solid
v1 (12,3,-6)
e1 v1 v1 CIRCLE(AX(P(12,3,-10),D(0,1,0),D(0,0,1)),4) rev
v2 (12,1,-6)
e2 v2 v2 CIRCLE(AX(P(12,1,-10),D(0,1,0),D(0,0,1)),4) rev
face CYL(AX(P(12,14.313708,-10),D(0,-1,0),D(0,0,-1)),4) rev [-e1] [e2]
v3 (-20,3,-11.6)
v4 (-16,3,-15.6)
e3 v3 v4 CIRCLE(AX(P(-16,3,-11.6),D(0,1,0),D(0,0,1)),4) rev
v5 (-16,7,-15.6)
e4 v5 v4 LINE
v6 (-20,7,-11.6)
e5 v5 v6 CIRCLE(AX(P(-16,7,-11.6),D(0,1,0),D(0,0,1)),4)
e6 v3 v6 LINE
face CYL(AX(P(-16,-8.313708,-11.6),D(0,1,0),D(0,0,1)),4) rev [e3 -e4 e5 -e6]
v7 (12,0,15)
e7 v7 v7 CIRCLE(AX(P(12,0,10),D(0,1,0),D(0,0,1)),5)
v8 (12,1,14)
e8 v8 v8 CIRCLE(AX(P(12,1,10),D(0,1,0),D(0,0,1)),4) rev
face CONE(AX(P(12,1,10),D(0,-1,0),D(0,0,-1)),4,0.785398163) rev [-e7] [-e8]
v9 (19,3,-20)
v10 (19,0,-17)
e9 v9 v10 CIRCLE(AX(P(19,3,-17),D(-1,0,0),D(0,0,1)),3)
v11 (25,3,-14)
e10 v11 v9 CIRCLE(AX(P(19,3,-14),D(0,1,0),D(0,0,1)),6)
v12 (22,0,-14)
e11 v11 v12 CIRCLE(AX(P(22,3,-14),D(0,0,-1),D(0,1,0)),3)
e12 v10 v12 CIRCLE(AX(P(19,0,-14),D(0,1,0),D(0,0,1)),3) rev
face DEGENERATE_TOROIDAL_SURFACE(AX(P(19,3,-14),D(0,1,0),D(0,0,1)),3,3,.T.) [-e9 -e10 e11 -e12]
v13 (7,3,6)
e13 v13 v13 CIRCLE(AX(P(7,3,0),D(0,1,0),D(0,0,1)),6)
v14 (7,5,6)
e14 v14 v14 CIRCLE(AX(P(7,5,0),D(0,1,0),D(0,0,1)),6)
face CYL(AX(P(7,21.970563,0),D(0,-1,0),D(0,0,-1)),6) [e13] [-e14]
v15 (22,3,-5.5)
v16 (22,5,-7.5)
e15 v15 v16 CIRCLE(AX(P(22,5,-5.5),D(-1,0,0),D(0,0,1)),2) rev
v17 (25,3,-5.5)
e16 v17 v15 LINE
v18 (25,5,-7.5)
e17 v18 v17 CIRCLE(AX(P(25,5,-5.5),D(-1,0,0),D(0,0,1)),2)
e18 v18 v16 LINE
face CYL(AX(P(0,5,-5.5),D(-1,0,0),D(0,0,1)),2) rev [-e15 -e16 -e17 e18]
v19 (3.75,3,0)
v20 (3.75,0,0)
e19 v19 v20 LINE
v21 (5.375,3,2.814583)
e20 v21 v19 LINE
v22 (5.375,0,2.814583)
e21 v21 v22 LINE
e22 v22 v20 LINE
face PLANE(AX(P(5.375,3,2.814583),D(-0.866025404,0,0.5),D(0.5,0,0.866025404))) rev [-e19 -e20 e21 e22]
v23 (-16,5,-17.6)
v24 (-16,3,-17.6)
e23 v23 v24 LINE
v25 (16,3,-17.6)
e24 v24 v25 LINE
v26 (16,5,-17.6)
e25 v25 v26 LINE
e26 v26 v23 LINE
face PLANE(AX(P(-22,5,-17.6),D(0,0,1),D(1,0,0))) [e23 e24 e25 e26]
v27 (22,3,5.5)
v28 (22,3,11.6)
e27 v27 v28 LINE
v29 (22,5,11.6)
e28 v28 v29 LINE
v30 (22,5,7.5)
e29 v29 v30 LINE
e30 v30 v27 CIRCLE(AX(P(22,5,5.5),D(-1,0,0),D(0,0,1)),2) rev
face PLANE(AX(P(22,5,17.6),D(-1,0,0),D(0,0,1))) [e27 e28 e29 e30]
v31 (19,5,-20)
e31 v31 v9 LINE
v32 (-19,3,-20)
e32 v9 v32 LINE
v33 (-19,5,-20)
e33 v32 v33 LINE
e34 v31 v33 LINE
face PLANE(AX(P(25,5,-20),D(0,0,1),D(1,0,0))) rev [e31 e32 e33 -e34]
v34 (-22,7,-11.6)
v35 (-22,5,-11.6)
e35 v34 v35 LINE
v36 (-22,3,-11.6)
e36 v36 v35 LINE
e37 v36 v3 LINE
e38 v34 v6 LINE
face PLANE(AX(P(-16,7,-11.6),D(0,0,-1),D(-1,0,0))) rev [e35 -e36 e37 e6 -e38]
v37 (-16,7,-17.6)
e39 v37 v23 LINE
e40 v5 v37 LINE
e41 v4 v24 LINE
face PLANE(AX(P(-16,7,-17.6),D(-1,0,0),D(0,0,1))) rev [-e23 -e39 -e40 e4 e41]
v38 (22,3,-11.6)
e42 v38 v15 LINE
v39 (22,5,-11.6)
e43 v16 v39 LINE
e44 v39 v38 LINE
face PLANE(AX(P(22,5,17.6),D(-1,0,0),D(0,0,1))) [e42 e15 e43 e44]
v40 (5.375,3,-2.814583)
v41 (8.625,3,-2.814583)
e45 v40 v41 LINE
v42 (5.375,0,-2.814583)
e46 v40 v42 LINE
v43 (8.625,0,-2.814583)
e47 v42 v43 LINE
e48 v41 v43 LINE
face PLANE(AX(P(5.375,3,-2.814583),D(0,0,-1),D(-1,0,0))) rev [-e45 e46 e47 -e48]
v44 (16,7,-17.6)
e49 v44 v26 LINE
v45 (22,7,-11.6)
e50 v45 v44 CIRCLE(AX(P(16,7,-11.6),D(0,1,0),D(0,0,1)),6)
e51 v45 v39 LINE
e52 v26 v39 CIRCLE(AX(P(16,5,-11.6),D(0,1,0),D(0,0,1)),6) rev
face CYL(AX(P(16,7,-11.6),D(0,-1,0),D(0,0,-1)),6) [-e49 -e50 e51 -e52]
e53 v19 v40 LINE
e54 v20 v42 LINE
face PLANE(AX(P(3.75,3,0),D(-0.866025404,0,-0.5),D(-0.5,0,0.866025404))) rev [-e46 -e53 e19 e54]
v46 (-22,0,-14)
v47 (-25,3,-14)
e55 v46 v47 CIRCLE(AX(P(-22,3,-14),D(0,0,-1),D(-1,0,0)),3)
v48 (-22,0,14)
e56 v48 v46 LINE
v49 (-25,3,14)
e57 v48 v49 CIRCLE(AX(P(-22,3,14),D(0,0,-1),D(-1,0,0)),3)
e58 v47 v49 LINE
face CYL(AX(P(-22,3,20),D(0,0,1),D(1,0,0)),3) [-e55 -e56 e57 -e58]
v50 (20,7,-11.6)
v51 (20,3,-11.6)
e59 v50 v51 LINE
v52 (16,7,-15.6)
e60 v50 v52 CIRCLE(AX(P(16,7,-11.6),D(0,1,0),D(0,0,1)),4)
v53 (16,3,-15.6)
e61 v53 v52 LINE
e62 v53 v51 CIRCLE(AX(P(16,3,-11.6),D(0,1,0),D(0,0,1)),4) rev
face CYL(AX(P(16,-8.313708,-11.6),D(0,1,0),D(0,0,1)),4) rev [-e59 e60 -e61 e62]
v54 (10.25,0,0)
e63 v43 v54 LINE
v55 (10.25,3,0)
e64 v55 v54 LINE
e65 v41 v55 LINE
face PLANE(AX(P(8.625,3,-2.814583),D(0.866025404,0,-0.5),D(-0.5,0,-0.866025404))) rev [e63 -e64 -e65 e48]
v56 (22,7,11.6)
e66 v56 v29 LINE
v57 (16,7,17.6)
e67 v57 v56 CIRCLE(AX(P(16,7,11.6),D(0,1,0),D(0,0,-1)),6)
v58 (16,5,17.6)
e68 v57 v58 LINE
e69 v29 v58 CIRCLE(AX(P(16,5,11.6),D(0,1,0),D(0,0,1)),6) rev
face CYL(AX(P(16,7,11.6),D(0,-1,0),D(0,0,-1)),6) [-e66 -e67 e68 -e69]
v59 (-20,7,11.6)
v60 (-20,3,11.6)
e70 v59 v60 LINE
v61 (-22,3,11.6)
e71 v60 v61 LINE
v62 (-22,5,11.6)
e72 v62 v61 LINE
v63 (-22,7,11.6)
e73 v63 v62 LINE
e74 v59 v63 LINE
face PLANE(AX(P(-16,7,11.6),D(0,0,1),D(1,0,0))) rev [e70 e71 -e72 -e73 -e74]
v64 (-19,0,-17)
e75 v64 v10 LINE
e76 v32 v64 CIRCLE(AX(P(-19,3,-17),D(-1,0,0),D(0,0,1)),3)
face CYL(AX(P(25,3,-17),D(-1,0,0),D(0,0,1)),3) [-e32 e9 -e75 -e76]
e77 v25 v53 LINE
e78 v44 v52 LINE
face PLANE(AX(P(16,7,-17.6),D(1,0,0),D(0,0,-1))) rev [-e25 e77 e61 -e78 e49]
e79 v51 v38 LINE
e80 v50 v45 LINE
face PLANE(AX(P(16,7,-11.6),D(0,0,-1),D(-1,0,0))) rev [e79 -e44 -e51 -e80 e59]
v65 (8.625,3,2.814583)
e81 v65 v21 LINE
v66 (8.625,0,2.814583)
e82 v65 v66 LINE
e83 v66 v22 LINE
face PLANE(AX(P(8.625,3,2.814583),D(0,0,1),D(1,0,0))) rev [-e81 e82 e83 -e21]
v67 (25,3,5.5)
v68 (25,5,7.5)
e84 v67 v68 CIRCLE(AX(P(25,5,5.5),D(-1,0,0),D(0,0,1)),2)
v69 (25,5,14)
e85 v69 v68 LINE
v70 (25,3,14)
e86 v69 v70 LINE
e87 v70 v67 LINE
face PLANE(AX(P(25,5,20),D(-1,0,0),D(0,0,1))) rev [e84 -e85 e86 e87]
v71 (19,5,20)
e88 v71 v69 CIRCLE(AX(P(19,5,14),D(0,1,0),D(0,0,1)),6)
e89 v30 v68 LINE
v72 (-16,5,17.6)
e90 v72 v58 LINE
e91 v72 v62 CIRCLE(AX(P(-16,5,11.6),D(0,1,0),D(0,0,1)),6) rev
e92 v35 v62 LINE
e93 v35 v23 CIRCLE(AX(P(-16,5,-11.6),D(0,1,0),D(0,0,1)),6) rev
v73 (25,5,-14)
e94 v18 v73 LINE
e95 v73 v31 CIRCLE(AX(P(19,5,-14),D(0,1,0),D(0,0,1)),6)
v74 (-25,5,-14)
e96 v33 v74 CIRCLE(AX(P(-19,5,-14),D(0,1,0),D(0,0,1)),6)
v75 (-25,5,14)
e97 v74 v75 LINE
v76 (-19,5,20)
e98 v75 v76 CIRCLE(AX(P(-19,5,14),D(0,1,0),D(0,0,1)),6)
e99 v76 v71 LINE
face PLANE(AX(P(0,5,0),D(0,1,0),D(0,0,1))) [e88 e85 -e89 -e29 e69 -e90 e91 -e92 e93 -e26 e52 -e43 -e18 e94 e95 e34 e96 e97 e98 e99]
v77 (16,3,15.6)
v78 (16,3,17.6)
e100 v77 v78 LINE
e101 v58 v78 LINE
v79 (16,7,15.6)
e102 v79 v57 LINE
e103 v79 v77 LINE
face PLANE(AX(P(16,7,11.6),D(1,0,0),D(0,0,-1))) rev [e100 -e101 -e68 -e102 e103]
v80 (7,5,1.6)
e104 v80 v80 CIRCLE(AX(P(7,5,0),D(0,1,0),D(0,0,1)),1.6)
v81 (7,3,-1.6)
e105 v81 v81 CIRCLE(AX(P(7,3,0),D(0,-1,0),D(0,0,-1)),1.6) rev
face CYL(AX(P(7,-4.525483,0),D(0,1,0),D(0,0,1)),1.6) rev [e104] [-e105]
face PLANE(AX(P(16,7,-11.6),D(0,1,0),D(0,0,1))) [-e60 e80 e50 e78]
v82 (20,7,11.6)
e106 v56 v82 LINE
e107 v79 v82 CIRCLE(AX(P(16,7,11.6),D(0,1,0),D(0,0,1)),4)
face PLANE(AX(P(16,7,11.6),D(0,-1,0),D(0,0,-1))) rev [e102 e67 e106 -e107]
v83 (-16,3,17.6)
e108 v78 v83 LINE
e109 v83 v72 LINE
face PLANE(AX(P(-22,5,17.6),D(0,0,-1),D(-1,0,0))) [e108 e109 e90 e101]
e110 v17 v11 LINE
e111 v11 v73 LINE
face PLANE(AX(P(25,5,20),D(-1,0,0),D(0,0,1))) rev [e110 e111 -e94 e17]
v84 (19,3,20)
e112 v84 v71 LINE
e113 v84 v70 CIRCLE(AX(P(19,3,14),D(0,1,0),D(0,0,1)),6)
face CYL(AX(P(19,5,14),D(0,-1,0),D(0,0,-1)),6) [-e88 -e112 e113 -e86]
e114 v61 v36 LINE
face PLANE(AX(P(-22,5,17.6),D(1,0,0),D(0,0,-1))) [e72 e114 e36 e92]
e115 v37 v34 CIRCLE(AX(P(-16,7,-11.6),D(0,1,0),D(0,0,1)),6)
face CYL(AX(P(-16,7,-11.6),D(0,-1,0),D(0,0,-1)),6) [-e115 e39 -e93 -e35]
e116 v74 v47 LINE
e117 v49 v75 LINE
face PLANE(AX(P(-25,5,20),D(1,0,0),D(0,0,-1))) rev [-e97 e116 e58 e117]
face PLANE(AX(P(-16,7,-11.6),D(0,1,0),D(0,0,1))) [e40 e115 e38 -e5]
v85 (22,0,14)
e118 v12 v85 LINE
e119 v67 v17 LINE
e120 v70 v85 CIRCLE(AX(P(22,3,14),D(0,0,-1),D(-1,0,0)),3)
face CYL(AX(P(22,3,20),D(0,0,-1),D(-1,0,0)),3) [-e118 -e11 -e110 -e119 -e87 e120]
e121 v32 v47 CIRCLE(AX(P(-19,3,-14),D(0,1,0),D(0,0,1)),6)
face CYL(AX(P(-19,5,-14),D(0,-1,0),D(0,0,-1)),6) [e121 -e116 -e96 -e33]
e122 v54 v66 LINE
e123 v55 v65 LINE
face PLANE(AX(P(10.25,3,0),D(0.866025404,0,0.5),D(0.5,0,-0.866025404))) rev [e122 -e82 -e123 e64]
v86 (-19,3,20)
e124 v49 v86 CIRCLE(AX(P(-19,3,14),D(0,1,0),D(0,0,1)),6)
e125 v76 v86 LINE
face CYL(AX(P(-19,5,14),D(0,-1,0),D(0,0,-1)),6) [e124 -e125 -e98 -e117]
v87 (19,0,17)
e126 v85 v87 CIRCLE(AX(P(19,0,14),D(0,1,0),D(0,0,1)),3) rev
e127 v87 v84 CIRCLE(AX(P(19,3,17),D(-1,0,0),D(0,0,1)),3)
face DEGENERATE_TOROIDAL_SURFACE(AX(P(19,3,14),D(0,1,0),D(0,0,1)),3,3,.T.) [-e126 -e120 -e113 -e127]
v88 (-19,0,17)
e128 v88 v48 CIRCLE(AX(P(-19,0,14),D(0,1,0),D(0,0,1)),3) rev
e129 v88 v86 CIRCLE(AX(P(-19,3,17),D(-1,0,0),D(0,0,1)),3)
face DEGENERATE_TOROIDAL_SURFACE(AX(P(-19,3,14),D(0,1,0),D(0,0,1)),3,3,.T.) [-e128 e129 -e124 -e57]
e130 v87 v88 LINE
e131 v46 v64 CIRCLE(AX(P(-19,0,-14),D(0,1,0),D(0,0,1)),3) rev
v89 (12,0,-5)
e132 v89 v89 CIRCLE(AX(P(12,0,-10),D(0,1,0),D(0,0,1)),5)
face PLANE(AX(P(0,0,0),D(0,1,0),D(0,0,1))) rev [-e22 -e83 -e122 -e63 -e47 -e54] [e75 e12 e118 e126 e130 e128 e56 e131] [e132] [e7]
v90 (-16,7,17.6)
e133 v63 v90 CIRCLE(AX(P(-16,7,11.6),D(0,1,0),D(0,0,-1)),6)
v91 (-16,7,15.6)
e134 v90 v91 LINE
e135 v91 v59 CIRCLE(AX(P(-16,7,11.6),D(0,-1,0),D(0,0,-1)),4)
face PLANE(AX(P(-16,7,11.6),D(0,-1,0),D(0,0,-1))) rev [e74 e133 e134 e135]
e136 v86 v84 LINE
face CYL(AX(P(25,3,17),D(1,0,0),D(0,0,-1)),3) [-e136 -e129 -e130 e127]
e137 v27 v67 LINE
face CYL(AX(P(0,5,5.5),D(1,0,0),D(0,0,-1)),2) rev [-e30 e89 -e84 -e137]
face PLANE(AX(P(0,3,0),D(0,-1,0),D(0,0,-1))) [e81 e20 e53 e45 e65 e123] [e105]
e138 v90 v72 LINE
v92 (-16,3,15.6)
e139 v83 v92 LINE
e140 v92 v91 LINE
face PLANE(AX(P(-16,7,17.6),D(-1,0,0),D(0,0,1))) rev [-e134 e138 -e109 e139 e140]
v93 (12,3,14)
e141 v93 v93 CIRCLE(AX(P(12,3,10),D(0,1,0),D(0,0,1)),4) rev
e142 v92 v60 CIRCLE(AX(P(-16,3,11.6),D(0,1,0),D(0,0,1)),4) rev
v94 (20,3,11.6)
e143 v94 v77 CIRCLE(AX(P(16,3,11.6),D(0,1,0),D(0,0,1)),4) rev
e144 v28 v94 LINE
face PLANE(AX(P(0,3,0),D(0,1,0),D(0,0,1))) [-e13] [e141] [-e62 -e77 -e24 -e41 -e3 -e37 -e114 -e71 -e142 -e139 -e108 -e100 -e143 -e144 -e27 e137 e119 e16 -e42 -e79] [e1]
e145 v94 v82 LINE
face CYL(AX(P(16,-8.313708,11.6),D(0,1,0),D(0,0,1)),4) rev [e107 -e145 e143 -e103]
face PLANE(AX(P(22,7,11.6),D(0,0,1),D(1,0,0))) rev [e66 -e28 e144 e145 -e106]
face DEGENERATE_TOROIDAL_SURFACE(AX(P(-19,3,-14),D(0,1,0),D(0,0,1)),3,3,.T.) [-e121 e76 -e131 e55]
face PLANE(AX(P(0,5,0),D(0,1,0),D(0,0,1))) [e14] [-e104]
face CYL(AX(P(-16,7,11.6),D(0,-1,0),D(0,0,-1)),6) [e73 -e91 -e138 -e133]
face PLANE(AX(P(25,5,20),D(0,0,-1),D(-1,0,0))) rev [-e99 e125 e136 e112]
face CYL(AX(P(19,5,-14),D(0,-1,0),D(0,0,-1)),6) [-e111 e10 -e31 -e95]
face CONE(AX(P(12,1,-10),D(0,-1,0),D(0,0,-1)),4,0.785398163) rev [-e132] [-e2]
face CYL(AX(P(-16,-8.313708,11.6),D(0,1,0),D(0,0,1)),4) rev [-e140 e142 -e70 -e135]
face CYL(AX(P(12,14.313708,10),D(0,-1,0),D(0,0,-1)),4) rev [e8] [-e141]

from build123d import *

# Parameters (mm, degrees)
SKETCH1_W           = 50
SKETCH1_H           = 40
SKETCH1_W_2         = 44
SKETCH1_H_2         = 35.2
BOSS_EXTRUDE1_DEPTH = 5
SKETCH2_W           = 44
SKETCH2_H           = 35.2
BOSS_EXTRUDE2_DEPTH = 3
SKETCH3_R           = 6
BOSS_EXTRUDE3_DEPTH = 2
SKETCH4_R           = 1.6
CUT_EXTRUDE1_DEPTH  = 5
FILLET1_R           = 6
FILLET2_R           = 3
CUT_EXTRUDE2_DEPTH  = 3
SKETCH8_R           = 4
CUT_EXTRUDE3_DEPTH  = 3
CHAMFER1_SIZE       = 1
SKETCH9_W           = 3
SKETCH9_H           = 15
CUT_EXTRUDE4_DEPTH  = 2
FILLET3_R           = 2
BOSS_EXTRUDE5_START = 4
BOSS_EXTRUDE5_DEPTH = 4
SKETCH11_R          = 4
CUT_EXTRUDE5_DEPTH  = 4


with BuildPart() as part:
    # Sketch1 → Boss-Extrude1 (new body)
    with BuildSketch(Plane(origin=(0, 0, 0), x_dir=(1, 0, 0), z_dir=(0, 1, 0))):
        Rectangle(SKETCH1_W, SKETCH1_H)
        Rectangle(SKETCH1_W_2, SKETCH1_H_2, mode=Mode.SUBTRACT)
    extrude(amount=BOSS_EXTRUDE1_DEPTH)

    # Sketch2 → Boss-Extrude2 (add)
    with BuildSketch(Plane(origin=(0, 0, 0), x_dir=(-1, 0, 0), z_dir=(0, -1, 0))):
        Rectangle(SKETCH2_W, SKETCH2_H)
    extrude(amount=-BOSS_EXTRUDE2_DEPTH)

    # Sketch3 → Boss-Extrude3 (add)
    with BuildSketch(Plane(origin=(0, 3, 0), x_dir=(1, 0, 0), z_dir=(0, 1, 0))):
        with Locations(Location((7, 0, 0), (0, 0, 270))):
            Circle(SKETCH3_R)
    extrude(amount=BOSS_EXTRUDE3_DEPTH)

    # Sketch4 → Cut-Extrude1 (cut)
    with BuildSketch(Plane(origin=(0, 5, 0), x_dir=(1, 0, 0), z_dir=(0, 1, 0))):
        with Locations(Location((7, 0, 0), (0, 0, 270))):
            Circle(SKETCH4_R)
    extrude(amount=-CUT_EXTRUDE1_DEPTH, mode=Mode.SUBTRACT)

    # Fillet1
    fillet1_edges = [part.edges().sort_by_distance(p)[0] for p in [
        (22, 4, 17.6),
        (22, 4, -17.6),
        (-22, 4, -17.6),
        (-22, 4, 17.6),
        (-25, 2.5, -20),
        (25, 2.5, -20),
        (25, 2.5, 20),
        (-25, 2.5, 20),
    ]]
    fillet(fillet1_edges, radius=FILLET1_R)

    # Fillet2
    fillet2_edges = [part.edges().sort_by_distance(p)[0] for p in [
        (-25, 0, 0),
        (0, 0, -20),
        (25, 0, 0),
        (0, 0, 20),
        (23.242640687, 0, -18.242640687),
        (23.242640687, 0, 18.242640687),
        (-23.242640687, 0, 18.242640687),
        (-23.242640687, 0, -18.242640687),
    ]]
    fillet(fillet2_edges, radius=FILLET2_R)

    # Sketch6 → Cut-Extrude2 (cut)
    with BuildSketch(Plane(origin=(0, 0, 0), x_dir=(-1, 0, 0), z_dir=(0, -1, 0))):
        Polygon((-3.75, 0), (-5.375, 2.814582562), (-8.625, 2.814582562), (-10.25, 0), (-8.625, -2.814582562), (-5.375, -2.814582562), align=None)
    extrude(amount=-CUT_EXTRUDE2_DEPTH, mode=Mode.SUBTRACT)

    # Sketch8 → Cut-Extrude3 (cut)
    with BuildSketch(Plane(origin=(0, 0, 0), x_dir=(-1, 0, 0), z_dir=(0, -1, 0))):
        with Locations(Location((-12, -10, 0), (0, 0, 90))):
            Circle(SKETCH8_R)
        with Locations(Location((-12, 10, 0), (0, 0, 90))):
            Circle(SKETCH8_R)
    extrude(amount=-CUT_EXTRUDE3_DEPTH, mode=Mode.SUBTRACT)

    # Chamfer1
    chamfer1_edges = [part.edges().sort_by_distance(p)[0] for p in [
        (12, 0, 14),
        (12, 0, -6),
    ]]
    chamfer(chamfer1_edges, length=CHAMFER1_SIZE)

    # Sketch9 → Cut-Extrude4 (cut)
    with BuildSketch(Plane(origin=(0, 5, 0), x_dir=(1, 0, 0), z_dir=(0, 1, 0))):
        with Locations((23.5, 0)):
            Rectangle(SKETCH9_W, SKETCH9_H)
    extrude(amount=-CUT_EXTRUDE4_DEPTH, mode=Mode.SUBTRACT)

    # Fillet3
    fillet3_edges = [part.edges().sort_by_distance(p)[0] for p in [
        (23.5, 3, -7.5),
        (23.5, 3, 7.5),
    ]]
    fillet(fillet3_edges, radius=FILLET3_R - 0.0001)  # a hair under: the kernel refuses the full size

    # Sketch10 → Boss-Extrude5 (add)
    with BuildSketch(Plane(origin=(0, 3, 0), x_dir=(1, 0, 0), z_dir=(0, 1, 0)).offset(BOSS_EXTRUDE5_START)):
        with BuildLine():
            Line((-16, -17.6), (-16, -11.6))
            Line((-16, -11.6), (-22, -11.6))
            ThreePointArc((-22, -11.6), (-20.242640687, -15.842640687), (-16, -17.6))
        make_face()
        with BuildLine():
            Line((-16, 17.6), (-16, 11.6))
            Line((-16, 11.6), (-22, 11.6))
            ThreePointArc((-22, 11.6), (-20.242640687, 15.842640687), (-16, 17.6))
        make_face()
        with BuildLine():
            Line((16, 17.6), (16, 11.6))
            Line((16, 11.6), (22, 11.6))
            ThreePointArc((22, 11.6), (20.242640687, 15.842640687), (16, 17.6))
        make_face()
        with BuildLine():
            Line((22, -11.6), (16, -11.6))
            Line((16, -11.6), (16, -17.6))
            ThreePointArc((16, -17.6), (20.242640687, -15.842640687), (22, -11.6))
        make_face()
    extrude(amount=-BOSS_EXTRUDE5_DEPTH)

    # Sketch11 → Cut-Extrude5 (cut)
    with BuildSketch(Plane(origin=(0, 7, 0), x_dir=(1, 0, 0), z_dir=(0, 1, 0))):
        with Locations((16, 11.6)):
            Circle(SKETCH11_R)
        with Locations((16, -11.6)):
            Circle(SKETCH11_R)
        with Locations((-16, -11.6)):
            Circle(SKETCH11_R)
        with Locations((-16, 11.6)):
            Circle(SKETCH11_R)
    extrude(amount=-CUT_EXTRUDE5_DEPTH, mode=Mode.SUBTRACT)


solid = part.part
